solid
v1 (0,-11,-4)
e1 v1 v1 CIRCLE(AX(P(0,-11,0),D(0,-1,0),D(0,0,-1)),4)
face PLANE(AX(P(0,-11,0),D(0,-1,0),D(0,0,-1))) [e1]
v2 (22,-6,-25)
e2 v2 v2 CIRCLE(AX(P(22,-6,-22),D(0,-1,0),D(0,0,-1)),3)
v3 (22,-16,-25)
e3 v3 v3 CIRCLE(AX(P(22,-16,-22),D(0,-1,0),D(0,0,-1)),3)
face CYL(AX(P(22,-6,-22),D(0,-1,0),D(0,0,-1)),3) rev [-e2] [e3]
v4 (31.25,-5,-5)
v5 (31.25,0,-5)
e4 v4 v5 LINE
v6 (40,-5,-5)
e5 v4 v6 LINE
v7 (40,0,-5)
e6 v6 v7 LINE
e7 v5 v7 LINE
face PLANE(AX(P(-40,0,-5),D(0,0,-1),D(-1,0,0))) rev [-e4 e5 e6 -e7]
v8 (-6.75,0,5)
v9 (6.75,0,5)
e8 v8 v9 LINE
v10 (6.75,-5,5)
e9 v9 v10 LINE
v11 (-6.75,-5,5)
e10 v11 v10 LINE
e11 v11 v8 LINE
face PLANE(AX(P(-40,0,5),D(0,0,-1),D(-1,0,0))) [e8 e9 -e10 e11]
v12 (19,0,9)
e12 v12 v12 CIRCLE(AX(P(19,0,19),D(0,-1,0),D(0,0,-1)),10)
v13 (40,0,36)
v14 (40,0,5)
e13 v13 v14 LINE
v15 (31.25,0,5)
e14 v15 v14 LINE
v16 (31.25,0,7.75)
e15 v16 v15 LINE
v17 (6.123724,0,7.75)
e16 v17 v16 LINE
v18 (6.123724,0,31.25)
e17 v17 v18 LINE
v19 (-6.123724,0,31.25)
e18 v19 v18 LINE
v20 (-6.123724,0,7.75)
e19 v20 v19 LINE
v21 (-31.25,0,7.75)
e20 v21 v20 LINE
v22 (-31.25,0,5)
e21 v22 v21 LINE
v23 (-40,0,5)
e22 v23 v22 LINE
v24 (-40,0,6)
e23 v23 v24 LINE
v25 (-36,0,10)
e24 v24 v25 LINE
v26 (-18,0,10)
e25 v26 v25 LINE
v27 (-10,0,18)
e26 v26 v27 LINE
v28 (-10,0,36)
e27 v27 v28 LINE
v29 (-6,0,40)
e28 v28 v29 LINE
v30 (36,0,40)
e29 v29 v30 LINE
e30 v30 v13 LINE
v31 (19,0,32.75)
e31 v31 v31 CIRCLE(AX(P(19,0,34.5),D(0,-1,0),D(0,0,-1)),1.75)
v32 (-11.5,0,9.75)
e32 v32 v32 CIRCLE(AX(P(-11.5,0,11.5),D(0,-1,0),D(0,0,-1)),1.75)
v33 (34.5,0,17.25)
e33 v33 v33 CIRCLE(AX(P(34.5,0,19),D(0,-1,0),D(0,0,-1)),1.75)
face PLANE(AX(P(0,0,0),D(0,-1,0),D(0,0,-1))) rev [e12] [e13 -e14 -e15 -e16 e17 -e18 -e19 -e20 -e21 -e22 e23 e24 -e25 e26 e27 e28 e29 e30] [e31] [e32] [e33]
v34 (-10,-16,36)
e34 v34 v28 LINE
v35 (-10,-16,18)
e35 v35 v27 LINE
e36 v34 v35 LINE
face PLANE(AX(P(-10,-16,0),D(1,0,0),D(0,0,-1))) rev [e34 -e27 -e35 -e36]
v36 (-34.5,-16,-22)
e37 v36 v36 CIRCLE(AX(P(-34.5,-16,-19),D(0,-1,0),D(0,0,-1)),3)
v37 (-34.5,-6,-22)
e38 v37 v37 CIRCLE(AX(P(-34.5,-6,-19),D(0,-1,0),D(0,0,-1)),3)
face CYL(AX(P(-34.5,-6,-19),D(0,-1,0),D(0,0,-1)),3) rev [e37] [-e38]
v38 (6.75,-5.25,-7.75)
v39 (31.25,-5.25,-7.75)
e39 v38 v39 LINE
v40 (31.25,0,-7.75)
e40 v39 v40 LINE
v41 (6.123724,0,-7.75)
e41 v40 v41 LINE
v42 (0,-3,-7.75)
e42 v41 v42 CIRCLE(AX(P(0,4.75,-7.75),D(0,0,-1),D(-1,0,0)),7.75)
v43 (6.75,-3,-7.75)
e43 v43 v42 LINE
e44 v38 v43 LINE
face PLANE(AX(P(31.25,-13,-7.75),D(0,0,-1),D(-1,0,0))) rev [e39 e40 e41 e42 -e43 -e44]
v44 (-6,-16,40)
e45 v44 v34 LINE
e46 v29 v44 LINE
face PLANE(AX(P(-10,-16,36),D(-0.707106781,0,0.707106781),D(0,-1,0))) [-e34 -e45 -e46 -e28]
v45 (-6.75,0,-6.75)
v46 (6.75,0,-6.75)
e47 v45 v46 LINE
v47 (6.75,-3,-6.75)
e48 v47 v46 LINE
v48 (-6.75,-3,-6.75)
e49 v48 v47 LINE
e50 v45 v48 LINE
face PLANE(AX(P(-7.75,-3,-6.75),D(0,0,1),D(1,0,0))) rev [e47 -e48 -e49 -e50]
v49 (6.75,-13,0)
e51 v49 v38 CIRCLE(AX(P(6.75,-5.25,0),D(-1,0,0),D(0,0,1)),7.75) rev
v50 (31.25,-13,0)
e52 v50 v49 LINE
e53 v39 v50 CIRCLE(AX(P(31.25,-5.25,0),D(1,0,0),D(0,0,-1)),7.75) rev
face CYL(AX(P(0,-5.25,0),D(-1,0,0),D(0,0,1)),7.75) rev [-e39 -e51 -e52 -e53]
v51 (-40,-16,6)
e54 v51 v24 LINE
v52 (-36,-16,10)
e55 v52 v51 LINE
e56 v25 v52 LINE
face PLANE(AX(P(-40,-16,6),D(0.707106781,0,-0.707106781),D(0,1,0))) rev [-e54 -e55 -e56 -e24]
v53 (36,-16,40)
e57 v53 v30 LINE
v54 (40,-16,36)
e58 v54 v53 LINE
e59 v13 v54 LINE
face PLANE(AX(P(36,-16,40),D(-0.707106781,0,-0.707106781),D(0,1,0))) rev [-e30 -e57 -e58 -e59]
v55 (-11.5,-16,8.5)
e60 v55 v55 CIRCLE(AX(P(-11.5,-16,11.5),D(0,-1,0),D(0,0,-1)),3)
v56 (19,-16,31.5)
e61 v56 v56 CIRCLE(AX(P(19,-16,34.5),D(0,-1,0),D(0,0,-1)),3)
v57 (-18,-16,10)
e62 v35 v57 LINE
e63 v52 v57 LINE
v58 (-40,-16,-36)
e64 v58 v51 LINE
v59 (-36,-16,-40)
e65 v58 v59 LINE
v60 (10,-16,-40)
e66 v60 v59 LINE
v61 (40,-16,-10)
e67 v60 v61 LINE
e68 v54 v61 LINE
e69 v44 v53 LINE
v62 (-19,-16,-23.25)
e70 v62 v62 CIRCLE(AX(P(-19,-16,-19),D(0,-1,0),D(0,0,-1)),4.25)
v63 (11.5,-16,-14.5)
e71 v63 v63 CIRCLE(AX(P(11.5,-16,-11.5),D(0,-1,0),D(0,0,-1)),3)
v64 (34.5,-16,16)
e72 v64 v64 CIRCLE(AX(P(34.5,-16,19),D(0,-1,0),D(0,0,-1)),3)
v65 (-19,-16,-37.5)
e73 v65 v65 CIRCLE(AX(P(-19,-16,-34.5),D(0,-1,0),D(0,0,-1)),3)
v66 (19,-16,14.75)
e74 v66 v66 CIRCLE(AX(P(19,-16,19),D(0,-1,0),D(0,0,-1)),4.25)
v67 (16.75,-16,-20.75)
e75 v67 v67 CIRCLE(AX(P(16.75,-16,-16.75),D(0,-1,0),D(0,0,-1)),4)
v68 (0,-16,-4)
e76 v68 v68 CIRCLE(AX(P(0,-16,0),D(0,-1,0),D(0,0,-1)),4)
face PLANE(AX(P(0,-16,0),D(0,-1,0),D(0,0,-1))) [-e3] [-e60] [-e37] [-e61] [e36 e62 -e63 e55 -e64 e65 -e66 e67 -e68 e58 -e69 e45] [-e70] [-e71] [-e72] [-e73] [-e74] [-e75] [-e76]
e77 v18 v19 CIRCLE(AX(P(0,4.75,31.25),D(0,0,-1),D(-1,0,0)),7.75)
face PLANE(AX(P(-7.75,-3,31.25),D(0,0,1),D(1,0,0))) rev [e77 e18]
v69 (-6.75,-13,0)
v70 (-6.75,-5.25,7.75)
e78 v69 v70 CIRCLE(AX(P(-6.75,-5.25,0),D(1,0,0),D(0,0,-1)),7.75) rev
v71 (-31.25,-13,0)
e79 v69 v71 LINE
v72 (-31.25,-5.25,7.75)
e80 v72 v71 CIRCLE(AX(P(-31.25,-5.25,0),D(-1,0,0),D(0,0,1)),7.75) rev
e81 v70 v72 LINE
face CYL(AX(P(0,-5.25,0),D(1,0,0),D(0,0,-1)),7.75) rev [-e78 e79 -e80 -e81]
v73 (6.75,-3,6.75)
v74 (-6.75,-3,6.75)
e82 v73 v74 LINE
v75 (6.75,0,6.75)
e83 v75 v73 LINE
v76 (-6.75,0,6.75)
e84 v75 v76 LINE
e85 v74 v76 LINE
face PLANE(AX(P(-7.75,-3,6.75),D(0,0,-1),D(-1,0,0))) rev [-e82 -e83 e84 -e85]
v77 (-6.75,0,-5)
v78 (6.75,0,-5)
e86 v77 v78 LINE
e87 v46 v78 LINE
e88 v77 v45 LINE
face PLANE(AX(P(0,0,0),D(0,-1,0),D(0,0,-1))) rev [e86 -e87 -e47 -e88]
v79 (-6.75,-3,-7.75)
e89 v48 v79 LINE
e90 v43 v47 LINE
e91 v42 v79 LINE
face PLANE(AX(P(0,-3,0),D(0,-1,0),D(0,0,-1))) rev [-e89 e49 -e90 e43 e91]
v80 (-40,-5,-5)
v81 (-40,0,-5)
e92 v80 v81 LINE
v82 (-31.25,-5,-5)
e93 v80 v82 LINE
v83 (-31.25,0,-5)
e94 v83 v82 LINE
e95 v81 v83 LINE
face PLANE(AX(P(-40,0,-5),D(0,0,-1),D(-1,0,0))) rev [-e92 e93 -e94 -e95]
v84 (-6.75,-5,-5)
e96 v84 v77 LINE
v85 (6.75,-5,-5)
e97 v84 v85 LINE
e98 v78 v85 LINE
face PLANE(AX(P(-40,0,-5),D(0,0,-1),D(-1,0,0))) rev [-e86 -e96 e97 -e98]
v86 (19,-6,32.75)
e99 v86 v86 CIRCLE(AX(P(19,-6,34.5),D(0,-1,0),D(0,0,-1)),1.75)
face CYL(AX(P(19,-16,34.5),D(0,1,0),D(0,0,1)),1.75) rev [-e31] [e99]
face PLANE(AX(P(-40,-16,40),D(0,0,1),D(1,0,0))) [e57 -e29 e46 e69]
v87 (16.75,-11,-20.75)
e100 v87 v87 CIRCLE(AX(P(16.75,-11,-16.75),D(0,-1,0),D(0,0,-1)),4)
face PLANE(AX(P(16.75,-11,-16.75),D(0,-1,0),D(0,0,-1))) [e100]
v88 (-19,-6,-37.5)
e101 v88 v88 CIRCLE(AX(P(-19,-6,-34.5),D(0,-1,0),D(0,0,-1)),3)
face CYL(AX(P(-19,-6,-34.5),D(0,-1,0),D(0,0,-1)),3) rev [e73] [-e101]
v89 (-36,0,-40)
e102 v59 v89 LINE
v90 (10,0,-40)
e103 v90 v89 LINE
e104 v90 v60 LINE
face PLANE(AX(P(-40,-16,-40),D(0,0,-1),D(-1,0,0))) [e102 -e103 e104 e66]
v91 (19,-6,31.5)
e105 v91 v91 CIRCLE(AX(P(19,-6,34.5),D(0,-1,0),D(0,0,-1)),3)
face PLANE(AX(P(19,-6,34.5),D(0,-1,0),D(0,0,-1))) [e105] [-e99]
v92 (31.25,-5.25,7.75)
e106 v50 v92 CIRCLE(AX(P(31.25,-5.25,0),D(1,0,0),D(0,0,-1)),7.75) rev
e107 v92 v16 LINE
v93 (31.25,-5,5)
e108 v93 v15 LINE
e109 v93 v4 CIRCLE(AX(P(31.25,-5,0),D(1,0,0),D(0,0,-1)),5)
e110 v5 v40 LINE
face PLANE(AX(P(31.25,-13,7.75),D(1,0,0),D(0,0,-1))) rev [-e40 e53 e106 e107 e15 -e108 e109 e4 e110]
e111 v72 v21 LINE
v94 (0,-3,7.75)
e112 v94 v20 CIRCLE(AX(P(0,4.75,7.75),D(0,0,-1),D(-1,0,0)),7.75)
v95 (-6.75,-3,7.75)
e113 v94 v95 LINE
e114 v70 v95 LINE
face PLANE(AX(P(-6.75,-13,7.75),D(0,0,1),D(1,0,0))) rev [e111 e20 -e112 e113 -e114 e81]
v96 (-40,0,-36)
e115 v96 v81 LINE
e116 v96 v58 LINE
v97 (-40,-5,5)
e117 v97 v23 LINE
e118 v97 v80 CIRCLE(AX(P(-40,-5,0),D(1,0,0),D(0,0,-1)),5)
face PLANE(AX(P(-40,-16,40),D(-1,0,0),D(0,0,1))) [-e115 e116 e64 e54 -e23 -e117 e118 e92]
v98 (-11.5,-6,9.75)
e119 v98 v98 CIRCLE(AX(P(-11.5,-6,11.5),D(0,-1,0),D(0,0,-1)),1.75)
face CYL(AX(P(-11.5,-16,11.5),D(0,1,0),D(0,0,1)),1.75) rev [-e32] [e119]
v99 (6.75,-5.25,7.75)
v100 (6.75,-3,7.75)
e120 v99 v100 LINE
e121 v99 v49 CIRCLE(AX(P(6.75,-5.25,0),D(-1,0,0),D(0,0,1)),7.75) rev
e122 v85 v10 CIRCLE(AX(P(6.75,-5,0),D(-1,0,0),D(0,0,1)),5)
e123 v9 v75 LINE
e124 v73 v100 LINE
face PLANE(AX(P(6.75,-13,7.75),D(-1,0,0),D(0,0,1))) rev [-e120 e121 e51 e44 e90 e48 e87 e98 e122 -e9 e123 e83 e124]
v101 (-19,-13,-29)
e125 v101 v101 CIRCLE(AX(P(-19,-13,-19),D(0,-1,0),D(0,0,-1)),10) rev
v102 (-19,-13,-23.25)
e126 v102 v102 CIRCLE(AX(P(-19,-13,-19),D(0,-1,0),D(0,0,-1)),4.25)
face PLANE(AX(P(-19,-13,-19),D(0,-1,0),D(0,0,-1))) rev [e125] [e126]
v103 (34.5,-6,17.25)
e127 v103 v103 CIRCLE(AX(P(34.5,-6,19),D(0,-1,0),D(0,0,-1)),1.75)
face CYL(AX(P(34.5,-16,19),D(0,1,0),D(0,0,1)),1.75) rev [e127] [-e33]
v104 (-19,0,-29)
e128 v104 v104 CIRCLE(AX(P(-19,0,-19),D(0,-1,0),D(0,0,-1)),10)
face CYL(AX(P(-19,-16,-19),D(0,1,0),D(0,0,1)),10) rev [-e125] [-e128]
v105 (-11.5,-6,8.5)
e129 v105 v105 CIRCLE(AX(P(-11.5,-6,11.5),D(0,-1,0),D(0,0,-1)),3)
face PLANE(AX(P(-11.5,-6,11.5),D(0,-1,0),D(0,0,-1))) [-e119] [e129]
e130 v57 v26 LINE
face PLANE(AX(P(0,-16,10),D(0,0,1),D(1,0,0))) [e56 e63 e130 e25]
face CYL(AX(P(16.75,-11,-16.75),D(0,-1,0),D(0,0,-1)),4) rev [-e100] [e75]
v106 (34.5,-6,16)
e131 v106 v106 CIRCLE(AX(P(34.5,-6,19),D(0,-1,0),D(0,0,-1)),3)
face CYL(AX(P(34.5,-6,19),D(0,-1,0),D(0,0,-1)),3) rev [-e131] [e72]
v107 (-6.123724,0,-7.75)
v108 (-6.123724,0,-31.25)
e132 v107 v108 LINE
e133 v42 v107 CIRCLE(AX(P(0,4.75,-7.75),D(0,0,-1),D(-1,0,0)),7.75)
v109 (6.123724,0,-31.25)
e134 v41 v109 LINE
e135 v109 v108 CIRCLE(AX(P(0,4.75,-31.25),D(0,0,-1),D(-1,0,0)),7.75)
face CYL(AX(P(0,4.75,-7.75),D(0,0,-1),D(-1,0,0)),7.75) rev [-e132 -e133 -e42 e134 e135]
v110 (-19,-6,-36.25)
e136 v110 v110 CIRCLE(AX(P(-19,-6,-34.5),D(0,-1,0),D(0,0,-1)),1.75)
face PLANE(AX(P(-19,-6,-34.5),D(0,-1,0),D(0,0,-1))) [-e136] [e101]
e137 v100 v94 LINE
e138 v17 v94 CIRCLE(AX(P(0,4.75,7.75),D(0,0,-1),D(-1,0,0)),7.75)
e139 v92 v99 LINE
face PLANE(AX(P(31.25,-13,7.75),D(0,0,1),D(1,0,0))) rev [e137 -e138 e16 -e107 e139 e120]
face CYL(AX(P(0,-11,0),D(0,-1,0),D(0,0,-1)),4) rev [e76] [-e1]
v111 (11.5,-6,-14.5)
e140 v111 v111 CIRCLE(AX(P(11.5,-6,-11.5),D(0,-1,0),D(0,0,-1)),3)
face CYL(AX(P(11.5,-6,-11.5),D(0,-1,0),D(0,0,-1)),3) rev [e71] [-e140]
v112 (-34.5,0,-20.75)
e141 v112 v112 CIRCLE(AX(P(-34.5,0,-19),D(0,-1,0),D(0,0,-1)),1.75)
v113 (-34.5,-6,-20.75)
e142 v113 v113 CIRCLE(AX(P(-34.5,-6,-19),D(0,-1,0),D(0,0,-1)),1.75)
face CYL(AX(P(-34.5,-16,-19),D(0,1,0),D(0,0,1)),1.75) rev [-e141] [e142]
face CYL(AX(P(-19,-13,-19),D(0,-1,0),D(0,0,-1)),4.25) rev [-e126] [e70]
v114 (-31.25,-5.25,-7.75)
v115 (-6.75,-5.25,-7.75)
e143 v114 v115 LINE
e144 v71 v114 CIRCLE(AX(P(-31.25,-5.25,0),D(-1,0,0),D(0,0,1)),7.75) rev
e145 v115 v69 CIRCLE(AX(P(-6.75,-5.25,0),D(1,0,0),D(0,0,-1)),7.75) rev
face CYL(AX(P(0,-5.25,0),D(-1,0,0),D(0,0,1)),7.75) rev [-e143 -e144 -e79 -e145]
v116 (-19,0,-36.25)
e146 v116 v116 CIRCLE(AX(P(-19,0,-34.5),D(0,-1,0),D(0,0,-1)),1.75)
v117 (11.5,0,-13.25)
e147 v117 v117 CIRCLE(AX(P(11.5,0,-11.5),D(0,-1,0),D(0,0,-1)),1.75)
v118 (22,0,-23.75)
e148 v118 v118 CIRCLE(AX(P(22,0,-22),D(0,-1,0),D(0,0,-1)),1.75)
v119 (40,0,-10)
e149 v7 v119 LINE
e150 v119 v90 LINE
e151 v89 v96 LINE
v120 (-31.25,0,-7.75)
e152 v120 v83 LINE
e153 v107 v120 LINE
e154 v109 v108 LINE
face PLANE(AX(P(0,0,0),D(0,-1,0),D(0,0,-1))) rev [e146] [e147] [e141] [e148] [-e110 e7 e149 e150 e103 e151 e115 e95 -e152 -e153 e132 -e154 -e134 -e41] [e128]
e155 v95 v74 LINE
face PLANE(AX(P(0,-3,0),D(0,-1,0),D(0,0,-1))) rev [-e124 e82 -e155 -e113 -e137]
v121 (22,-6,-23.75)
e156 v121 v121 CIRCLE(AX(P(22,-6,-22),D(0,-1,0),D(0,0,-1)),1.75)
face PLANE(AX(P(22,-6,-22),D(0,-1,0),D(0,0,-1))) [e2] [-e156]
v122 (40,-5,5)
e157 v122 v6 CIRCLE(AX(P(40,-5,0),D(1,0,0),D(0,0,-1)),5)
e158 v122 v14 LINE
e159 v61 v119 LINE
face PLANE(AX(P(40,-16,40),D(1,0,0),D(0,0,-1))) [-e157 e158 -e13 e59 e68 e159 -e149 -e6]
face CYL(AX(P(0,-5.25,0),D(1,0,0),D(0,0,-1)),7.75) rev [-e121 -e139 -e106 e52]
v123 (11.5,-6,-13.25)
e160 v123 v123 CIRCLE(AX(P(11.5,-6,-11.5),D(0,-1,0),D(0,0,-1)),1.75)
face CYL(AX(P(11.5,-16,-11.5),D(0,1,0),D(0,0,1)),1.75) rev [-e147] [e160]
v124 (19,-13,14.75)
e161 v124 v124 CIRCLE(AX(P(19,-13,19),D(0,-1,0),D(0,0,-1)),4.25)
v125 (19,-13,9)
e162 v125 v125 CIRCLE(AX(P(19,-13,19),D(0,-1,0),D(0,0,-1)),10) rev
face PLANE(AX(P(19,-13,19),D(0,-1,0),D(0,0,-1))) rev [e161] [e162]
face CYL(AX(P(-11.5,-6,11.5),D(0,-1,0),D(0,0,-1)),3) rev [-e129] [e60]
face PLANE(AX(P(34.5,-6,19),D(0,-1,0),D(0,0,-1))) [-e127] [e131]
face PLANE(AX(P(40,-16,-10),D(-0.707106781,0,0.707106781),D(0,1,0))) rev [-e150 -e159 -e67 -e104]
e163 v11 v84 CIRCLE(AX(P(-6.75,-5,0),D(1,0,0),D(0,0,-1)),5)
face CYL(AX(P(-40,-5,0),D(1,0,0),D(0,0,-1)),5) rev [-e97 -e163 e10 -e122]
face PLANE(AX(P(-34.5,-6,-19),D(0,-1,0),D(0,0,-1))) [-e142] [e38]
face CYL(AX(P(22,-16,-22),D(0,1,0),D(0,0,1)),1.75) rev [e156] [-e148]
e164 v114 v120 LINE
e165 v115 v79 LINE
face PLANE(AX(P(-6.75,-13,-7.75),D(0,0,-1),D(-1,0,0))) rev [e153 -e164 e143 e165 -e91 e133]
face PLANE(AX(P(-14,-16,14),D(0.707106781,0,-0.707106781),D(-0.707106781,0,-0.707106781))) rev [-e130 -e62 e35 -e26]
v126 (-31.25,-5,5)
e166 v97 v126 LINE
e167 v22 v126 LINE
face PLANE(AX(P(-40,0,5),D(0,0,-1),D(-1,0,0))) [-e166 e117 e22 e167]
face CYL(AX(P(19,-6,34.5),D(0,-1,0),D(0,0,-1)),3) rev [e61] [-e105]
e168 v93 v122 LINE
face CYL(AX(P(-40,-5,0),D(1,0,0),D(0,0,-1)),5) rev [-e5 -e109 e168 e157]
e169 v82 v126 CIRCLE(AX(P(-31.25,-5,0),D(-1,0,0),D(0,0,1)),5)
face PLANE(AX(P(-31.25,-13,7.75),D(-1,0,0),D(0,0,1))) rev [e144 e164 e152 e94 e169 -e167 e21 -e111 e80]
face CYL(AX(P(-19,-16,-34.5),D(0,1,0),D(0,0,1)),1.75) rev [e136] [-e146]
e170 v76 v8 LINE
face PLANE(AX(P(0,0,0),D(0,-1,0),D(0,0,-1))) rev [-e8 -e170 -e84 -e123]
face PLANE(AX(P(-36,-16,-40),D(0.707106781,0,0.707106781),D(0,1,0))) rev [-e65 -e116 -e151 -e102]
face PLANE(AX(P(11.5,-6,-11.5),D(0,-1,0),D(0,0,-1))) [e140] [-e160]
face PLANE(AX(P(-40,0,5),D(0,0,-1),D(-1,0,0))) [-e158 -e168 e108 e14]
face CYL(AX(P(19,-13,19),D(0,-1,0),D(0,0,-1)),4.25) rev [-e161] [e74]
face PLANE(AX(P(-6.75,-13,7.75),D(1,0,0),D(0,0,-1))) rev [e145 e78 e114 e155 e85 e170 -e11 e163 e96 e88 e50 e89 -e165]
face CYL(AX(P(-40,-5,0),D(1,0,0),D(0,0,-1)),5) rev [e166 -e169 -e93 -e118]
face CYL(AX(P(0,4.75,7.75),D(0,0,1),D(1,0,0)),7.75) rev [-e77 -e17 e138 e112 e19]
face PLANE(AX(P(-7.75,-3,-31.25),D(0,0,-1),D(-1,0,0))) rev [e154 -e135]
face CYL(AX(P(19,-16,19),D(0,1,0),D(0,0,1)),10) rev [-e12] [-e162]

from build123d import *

# Parameters (mm, degrees)
SKETCH1_W               = 80
SKETCH1_H               = 80
BOSS_EXTRUDE1_DEPTH     = 16
CUT_EXTRUDE1_DEPTH      = 59.787753827
CUT_EXTRUDE1_DEPTH_BACK = 59.787753827
SKETCH2_R               = 1.75
SKETCH3_W               = 24.5
SKETCH3_H               = 15.5
CUT_EXTRUDE2_DEPTH      = 13
FILLET1_R               = 7.75
SKETCH4_W               = 15.5
SKETCH4_H               = 24.5
CUT_EXTRUDE3_DEPTH      = 3
BOSS_EXTRUDE2_DEPTH     = 23.5
CUT_EXTRUDE4_DEPTH      = 59.787753827
CUT_EXTRUDE4_DEPTH_BACK = 59.787753827
CUT_EXTRUDE5_DEPTH      = 59.787753827
CUT_EXTRUDE5_DEPTH_BACK = 59.787753827
SKETCH7_R               = 10
CUT_EXTRUDE6_DEPTH      = 59.787753827
CUT_EXTRUDE6_DEPTH_BACK = 59.787753827
CHAMFER1_SIZE           = 4
CHAMFER2_SIZE           = 30
BOSS_EXTRUDE4_START     = -3
SKETCH11_R              = 10
SKETCH11_R_2            = 4.25
BOSS_EXTRUDE4_DEPTH     = 3
SKETCH12_R              = 4
CUT_EXTRUDE7_DEPTH      = 5
CUT_EXTRUDE8_START      = -10
SKETCH13_R              = 3
SKETCH13_R_2            = 1.75
CUT_EXTRUDE8_DEPTH      = 10


with BuildPart() as part:
    # Sketch1 → Boss-Extrude1 (new body)
    with BuildSketch(Plane(origin=(0, 0, 0), x_dir=(1, 0, 0), z_dir=(0, 1, 0))):
        Rectangle(SKETCH1_W, SKETCH1_H)
    extrude(amount=-BOSS_EXTRUDE1_DEPTH)

    # Sketch2 → Cut-Extrude1 (cut, two sides: drawn at the far end of the back side and taken through both)
    with BuildSketch(Plane(origin=(0, 0, 0), x_dir=(1, 0, 0), z_dir=(0, 1, 0)).offset(-CUT_EXTRUDE1_DEPTH_BACK)):
        with Locations(Location((-11.5, -11.5, 0), (0, 0, 270))):
            Circle(SKETCH2_R)
        with Locations(Location((11.5, 11.5, 0), (0, 0, 270))):
            Circle(SKETCH2_R)
        with Locations(Location((22, 22, 0), (0, 0, 270))):
            Circle(SKETCH2_R)
        with Locations(Location((19, -34.5, 0), (0, 0, 270))):
            Circle(SKETCH2_R)
        with Locations(Location((34.5, -19, 0), (0, 0, 270))):
            Circle(SKETCH2_R)
        with Locations(Location((-34.5, 19, 0), (0, 0, 270))):
            Circle(SKETCH2_R)
        with Locations(Location((-19, 34.5, 0), (0, 0, 270))):
            Circle(SKETCH2_R)
    extrude(amount=CUT_EXTRUDE1_DEPTH + CUT_EXTRUDE1_DEPTH_BACK, mode=Mode.SUBTRACT)

    # Sketch3 → Cut-Extrude2 (cut)
    with BuildSketch(Plane(origin=(0, 0, 0), x_dir=(1, 0, 0), z_dir=(0, 1, 0))):
        with Locations((19, 0)):
            Rectangle(SKETCH3_W, SKETCH3_H)
        with Locations((-19, 0)):
            Rectangle(SKETCH3_W, SKETCH3_H)
    extrude(amount=-CUT_EXTRUDE2_DEPTH, mode=Mode.SUBTRACT)

    # Fillet1
    fillet1_edges = [part.edges().sort_by_distance(p)[0] for p in [
        (19, -13, 7.75),
        (19, -13, -7.75),
        (-19, -13, 7.75),
        (-19, -13, -7.75),
    ]]
    fillet(fillet1_edges, radius=FILLET1_R - 0.0001)  # a hair under: the kernel refuses the full size

    # Sketch4 → Cut-Extrude3 (cut)
    with BuildSketch(Plane(origin=(0, 0, 0), x_dir=(1, 0, 0), z_dir=(0, 1, 0))):
        with Locations((0, -19)):
            Rectangle(SKETCH4_W, SKETCH4_H)
        with Locations((0, 19)):
            Rectangle(SKETCH4_W, SKETCH4_H)
    extrude(amount=-CUT_EXTRUDE3_DEPTH, mode=Mode.SUBTRACT)

    # Sketch5 → Boss-Extrude2 (add)
    with BuildSketch(Plane(origin=(0, 0, 31.25), x_dir=(-1, 0, 0), z_dir=(0, 0, -1))):
        with BuildLine():
            ThreePointArc((-8e-09, -3), (-3.409545428, -2.209705452), (-6.123724357, 0))
            Line((-6.123724357, 0), (-7.75, 0))
            Line((-7.75, 0), (-7.75, -3))
            Line((-7.75, -3), (-8e-09, -3))
        make_face()
        with BuildLine():
            Line((7.75, -3), (7.75, 0))
            Line((7.75, 0), (6.123724357, 0))
            ThreePointArc((6.123724357, 0), (3.409545421, -2.209705455), (-8e-09, -3))
            Line((-8e-09, -3), (7.75, -3))
        make_face()
    boss_extrude2 = extrude(amount=BOSS_EXTRUDE2_DEPTH)

    # Mirror1: Boss-Extrude2 across plane
    add(boss_extrude2.mirror(Plane.XY))

    # Sketch6 → Cut-Extrude4 (cut, two sides: drawn at the far end of the back side and taken through both)
    with BuildSketch(Plane(origin=(0, 0, 0), x_dir=(0, 0, -1), z_dir=(1, 0, 0)).offset(-CUT_EXTRUDE4_DEPTH_BACK)):
        with BuildLine():
            ThreePointArc((-5, -5), (0, -10), (5, -5))
            Line((5, -5), (-5, -5))
        make_face()
        with BuildLine():
            Line((-5, -5), (5, -5))
            ThreePointArc((5, -5), (3.535533906, -1.464466094), (0, 0))
            ThreePointArc((0, 0), (-3.535533906, -1.464466094), (-5, -5))
        make_face()
        with BuildLine():
            Line((-5, 0), (-5, -5))
            ThreePointArc((-5, -5), (-3.535533906, -1.464466094), (0, 0))
            Line((0, 0), (-5, 0))
        make_face()
        with BuildLine():
            ThreePointArc((0, 0), (3.535533906, -1.464466094), (5, -5))
            Line((5, -5), (5, 0))
            Line((5, 0), (0, 0))
        make_face()
    extrude(amount=CUT_EXTRUDE4_DEPTH + CUT_EXTRUDE4_DEPTH_BACK, mode=Mode.SUBTRACT)

    # Sketch7 → Cut-Extrude5 (cut, two sides: drawn at the far end of the back side and taken through both)
    with BuildSketch(Plane(origin=(0, 0, 0), x_dir=(1, 0, 0), z_dir=(0, 1, 0)).offset(-CUT_EXTRUDE5_DEPTH_BACK)):
        with Locations(Location((19, -19, 0), (0, 0, 270))):
            Circle(SKETCH7_R)
        with Locations(Location((-19, 19, 0), (0, 0, 270))):
            Circle(SKETCH7_R)
    extrude(amount=CUT_EXTRUDE5_DEPTH + CUT_EXTRUDE5_DEPTH_BACK, mode=Mode.SUBTRACT)

    # Sketch9 → Cut-Extrude6 (cut, two sides: drawn at the far end of the back side and taken through both)
    with BuildSketch(Plane(origin=(0, 0, 0), x_dir=(1, 0, 0), z_dir=(0, 1, 0)).offset(-CUT_EXTRUDE6_DEPTH_BACK)):
        Polygon((-10, -18), (-18, -10), (-18, -18), align=None)
        Polygon((-10, -40), (-10, -18), (-18, -18), (-18, -10), (-40, -10), (-40, -40), align=None)
    extrude(amount=CUT_EXTRUDE6_DEPTH + CUT_EXTRUDE6_DEPTH_BACK, mode=Mode.SUBTRACT)

    # Chamfer1
    chamfer1_edges = [part.edges().sort_by_distance(p)[0] for p in [
        (-10, -8, 40),
        (-40, -8, 10),
        (40, -8, 40),
        (-40, -8, -40),
    ]]
    chamfer(chamfer1_edges, length=CHAMFER1_SIZE)

    # Chamfer2
    chamfer2_edges = [part.edges().sort_by_distance(p)[0] for p in [
        (40, -8, -40),
    ]]
    chamfer(chamfer2_edges, length=CHAMFER2_SIZE)

    # Sketch11 → Boss-Extrude4 (add)
    # profile 1 of 2: a face of its own
    with BuildSketch(Plane.XZ.offset(16).offset(BOSS_EXTRUDE4_START)):
        with Locations(Location((-19, -19, 0), (0, 0, 270))):
            Circle(SKETCH11_R)
        with Locations(Location((-19, -19, 0), (0, 0, 270))):
            Circle(SKETCH11_R_2, mode=Mode.SUBTRACT)
    # profile 2 of 2: a face of its own
    with BuildSketch(Plane.XZ.offset(16).offset(BOSS_EXTRUDE4_START)):
        with Locations(Location((19, 19, 0), (0, 0, 270))):
            Circle(SKETCH11_R)
        with Locations(Location((19, 19, 0), (0, 0, 270))):
            Circle(SKETCH11_R_2, mode=Mode.SUBTRACT)
    extrude(amount=BOSS_EXTRUDE4_DEPTH)

    # Sketch12 → Cut-Extrude7 (cut)
    with BuildSketch(Plane.XZ.offset(16)):
        with Locations(Location((0, 0, 0), (0, 0, 270))):
            Circle(SKETCH12_R)
        with Locations(Location((16.75, -16.75, 0), (0, 0, 270))):
            Circle(SKETCH12_R)
    extrude(amount=-CUT_EXTRUDE7_DEPTH, mode=Mode.SUBTRACT)

    # Sketch13 → Cut-Extrude8 (cut)
    # profile 1 of 7: a face of its own
    with BuildSketch(Plane.XZ.offset(16).offset(CUT_EXTRUDE8_START)):
        with Locations(Location((19, 34.5, 0), (0, 0, 270))):
            Circle(SKETCH13_R)
        with Locations(Location((19, 34.5, 0), (0, 0, 270))):
            Circle(SKETCH13_R_2, mode=Mode.SUBTRACT)
    # profile 2 of 7: a face of its own
    with BuildSketch(Plane.XZ.offset(16).offset(CUT_EXTRUDE8_START)):
        with Locations(Location((34.5, 19, 0), (0, 0, 270))):
            Circle(SKETCH13_R)
        with Locations(Location((34.5, 19, 0), (0, 0, 270))):
            Circle(SKETCH13_R_2, mode=Mode.SUBTRACT)
    # profile 3 of 7: a face of its own
    with BuildSketch(Plane.XZ.offset(16).offset(CUT_EXTRUDE8_START)):
        with Locations(Location((-11.5, 11.5, 0), (0, 0, 270))):
            Circle(SKETCH13_R)
        with Locations(Location((-11.5, 11.5, 0), (0, 0, 270))):
            Circle(SKETCH13_R_2, mode=Mode.SUBTRACT)
    # profile 4 of 7: a face of its own
    with BuildSketch(Plane.XZ.offset(16).offset(CUT_EXTRUDE8_START)):
        with Locations(Location((-34.5, -19, 0), (0, 0, 270))):
            Circle(SKETCH13_R)
        with Locations(Location((-34.5, -19, 0), (0, 0, 270))):
            Circle(SKETCH13_R_2, mode=Mode.SUBTRACT)
    # profile 5 of 7: a face of its own
    with BuildSketch(Plane.XZ.offset(16).offset(CUT_EXTRUDE8_START)):
        with Locations(Location((-19, -34.5, 0), (0, 0, 270))):
            Circle(SKETCH13_R)
        with Locations(Location((-19, -34.5, 0), (0, 0, 270))):
            Circle(SKETCH13_R_2, mode=Mode.SUBTRACT)
    # profile 6 of 7: a face of its own
    with BuildSketch(Plane.XZ.offset(16).offset(CUT_EXTRUDE8_START)):
        with Locations(Location((11.5, -11.5, 0), (0, 0, 270))):
            Circle(SKETCH13_R)
        with Locations(Location((11.5, -11.5, 0), (0, 0, 270))):
            Circle(SKETCH13_R_2, mode=Mode.SUBTRACT)
    # profile 7 of 7: a face of its own
    with BuildSketch(Plane.XZ.offset(16).offset(CUT_EXTRUDE8_START)):
        with Locations(Location((22, -22, 0), (0, 0, 270))):
            Circle(SKETCH13_R)
        with Locations(Location((22, -22, 0), (0, 0, 270))):
            Circle(SKETCH13_R_2, mode=Mode.SUBTRACT)
    extrude(amount=CUT_EXTRUDE8_DEPTH, mode=Mode.SUBTRACT)


solid = part.part
